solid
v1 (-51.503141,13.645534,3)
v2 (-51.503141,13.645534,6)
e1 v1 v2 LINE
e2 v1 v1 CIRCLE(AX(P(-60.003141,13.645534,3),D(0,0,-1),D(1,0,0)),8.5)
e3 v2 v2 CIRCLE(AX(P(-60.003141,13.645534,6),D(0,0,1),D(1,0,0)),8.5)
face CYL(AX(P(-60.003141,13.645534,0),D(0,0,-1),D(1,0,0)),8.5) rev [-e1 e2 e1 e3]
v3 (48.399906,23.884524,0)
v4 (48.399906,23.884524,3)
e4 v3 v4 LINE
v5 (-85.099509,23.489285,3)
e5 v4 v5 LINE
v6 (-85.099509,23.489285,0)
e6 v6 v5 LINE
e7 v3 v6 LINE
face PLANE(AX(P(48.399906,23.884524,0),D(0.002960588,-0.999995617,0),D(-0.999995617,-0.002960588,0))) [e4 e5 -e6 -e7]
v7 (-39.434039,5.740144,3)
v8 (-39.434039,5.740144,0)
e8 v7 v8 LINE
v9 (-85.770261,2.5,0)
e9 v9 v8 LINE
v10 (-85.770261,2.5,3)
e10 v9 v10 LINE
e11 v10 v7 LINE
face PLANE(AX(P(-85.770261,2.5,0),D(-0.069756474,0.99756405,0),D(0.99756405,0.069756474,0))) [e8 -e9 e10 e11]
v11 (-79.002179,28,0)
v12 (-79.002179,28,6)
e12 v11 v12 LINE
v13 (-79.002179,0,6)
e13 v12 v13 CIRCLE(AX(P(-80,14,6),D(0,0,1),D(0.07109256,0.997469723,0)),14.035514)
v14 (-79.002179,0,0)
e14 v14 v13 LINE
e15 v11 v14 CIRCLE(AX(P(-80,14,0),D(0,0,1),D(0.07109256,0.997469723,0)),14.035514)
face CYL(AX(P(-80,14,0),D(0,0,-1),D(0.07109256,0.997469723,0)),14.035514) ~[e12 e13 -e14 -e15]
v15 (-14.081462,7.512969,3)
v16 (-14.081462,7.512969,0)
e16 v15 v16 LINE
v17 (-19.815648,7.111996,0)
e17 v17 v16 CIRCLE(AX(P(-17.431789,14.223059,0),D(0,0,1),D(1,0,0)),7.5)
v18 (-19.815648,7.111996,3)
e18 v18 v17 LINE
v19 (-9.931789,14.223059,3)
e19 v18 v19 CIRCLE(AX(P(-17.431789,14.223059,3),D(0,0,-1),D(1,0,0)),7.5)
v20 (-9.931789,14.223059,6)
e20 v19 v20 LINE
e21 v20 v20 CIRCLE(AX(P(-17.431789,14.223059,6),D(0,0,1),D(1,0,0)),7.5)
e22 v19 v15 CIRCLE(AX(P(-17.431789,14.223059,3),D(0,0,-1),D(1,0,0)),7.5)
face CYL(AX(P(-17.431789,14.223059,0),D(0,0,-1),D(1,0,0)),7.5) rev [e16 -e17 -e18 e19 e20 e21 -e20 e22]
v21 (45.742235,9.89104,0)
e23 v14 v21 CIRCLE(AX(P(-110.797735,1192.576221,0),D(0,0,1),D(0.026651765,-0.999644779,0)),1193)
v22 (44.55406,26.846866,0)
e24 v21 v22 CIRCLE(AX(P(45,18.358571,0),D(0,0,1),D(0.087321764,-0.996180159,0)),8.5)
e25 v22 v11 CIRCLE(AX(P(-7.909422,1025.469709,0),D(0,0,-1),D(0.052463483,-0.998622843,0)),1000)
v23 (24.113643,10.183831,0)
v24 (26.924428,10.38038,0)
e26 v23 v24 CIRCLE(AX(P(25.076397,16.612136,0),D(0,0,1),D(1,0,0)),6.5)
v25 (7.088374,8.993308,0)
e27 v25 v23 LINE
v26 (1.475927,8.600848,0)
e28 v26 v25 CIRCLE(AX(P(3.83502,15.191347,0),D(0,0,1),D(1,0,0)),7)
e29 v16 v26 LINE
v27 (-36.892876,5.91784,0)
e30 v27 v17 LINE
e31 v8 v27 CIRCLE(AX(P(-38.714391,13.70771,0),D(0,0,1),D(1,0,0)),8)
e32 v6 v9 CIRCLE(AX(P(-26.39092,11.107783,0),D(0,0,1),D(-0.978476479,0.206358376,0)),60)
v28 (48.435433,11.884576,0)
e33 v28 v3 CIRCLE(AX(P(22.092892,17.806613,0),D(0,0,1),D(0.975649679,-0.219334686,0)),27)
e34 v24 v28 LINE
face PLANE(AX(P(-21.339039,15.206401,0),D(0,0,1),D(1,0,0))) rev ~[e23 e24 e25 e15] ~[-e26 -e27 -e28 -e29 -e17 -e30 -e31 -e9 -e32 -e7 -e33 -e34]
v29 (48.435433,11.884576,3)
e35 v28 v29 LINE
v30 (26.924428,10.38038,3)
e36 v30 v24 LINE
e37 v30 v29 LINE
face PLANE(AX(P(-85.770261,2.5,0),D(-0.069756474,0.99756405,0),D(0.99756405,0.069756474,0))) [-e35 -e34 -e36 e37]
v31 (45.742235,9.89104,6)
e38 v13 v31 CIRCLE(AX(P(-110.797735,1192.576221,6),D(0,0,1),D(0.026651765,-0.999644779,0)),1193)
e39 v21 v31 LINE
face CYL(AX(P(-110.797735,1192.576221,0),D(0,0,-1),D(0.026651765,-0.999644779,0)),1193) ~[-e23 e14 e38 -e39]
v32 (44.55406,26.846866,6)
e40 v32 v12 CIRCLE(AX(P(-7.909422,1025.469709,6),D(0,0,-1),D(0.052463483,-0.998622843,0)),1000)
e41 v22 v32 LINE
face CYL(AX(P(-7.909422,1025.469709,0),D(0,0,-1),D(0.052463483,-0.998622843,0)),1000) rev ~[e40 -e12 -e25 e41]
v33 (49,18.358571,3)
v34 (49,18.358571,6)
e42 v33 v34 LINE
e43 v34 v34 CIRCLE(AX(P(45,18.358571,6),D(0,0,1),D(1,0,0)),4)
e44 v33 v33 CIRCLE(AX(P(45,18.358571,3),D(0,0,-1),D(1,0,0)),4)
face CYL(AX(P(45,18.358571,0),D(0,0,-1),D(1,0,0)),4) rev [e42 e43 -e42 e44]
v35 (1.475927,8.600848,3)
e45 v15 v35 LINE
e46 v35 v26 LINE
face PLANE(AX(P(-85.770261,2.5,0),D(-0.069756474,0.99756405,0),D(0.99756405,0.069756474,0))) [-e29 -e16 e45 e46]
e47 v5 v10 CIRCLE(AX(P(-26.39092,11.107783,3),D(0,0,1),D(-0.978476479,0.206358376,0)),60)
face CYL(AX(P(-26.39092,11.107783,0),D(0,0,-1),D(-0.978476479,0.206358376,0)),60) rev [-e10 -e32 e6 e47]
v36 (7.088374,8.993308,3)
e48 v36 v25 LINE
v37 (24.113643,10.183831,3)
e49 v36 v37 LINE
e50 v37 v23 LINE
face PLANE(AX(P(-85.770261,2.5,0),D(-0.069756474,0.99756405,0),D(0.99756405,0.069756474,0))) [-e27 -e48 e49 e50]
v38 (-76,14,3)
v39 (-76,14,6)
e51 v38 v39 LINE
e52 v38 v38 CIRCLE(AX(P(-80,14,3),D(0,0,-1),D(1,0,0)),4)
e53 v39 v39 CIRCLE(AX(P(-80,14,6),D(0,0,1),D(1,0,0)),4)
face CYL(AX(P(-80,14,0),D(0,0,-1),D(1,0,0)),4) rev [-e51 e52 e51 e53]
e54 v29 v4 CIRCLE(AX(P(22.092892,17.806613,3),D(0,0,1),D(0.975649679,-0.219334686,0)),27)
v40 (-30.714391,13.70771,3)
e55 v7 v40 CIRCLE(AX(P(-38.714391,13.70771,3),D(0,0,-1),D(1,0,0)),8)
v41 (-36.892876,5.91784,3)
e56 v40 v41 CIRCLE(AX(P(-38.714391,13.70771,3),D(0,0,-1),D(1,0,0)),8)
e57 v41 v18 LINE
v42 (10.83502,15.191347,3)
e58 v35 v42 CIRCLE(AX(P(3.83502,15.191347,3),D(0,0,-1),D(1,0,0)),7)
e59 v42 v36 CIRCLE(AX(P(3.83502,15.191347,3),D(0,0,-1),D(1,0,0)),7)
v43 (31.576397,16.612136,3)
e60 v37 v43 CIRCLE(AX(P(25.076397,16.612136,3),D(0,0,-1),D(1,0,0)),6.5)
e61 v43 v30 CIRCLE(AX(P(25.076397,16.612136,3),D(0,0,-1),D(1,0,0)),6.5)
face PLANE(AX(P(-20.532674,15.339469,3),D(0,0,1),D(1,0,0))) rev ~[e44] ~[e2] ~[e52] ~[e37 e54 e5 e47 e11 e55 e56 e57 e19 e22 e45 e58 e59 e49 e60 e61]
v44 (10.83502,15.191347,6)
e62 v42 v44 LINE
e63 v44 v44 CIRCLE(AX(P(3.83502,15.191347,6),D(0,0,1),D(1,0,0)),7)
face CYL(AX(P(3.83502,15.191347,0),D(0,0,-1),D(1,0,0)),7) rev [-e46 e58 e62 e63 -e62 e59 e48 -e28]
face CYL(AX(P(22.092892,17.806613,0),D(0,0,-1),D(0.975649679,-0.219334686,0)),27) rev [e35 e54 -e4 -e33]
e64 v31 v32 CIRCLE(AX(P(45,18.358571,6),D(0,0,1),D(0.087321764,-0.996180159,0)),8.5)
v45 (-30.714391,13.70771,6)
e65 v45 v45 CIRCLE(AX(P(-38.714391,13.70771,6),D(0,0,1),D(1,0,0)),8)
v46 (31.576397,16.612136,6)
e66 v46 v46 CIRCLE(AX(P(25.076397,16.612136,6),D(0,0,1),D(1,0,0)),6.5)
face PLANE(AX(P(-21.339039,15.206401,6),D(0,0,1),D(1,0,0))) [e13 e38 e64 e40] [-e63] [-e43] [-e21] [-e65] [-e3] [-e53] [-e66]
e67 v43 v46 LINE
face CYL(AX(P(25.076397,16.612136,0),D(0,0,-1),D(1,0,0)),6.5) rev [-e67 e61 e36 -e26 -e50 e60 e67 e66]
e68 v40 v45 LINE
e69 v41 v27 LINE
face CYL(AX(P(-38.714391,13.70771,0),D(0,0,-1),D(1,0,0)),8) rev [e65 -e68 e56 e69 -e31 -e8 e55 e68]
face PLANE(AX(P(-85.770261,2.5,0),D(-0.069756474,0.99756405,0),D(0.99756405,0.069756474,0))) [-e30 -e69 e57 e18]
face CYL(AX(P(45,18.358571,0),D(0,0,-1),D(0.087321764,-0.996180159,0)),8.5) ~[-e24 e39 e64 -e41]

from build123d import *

# Parameters (mm, degrees)
F0_R     = 8.5
F0_R_2   = 8
F0_R_3   = 4
F0_R_4   = 7.5
F0_R_5   = 7
F0_R_6   = 6.5
F1_DEPTH = 6
F3_DEPTH = 3


# Not quite as in the source:
# - ends of sketch curves that miss each other by under 0.0002 mm in the source are joined


with BuildPart() as f1:
    # F0 (on Top) → F1 (new body)
    with BuildSketch(Plane.XY):
        with BuildLine():
            ThreePointArc((44.5540603798, 26.8468655378), (-17.2418869333, 25.5132571498), (-79.0021794007, 28))
            ThreePointArc((-79.0021794007, 28), (-94.0355137401, 14), (-79.0021794007, 0))
            ThreePointArc((-79.0021794007, 0), (-16.5001968513, 3.3088101205), (45.7422348275, 9.8910396618))
            ThreePointArc((45.7422348275, 9.8910396618), (53.4792070742, 18.9527489424), (44.5540603798, 26.8468655378))
        make_face()
        with Locations((-60.0031413922, 13.6455344589)):
            Circle(F0_R, mode=Mode.SUBTRACT)
        with Locations((-38.7143914059, 13.7077101978)):
            Circle(F0_R_2, mode=Mode.SUBTRACT)
        with Locations((-80, 14)):
            Circle(F0_R_3, mode=Mode.SUBTRACT)
        with Locations((-17.4317891816, 14.2230589801)):
            Circle(F0_R_4, mode=Mode.SUBTRACT)
        with Locations((3.8350196915, 15.191347242)):
            Circle(F0_R_5, mode=Mode.SUBTRACT)
        with Locations((25.0763967822, 16.6121361411)):
            Circle(F0_R_6, mode=Mode.SUBTRACT)
        with Locations((45, 18.3585710294)):
            Circle(F0_R_3, mode=Mode.SUBTRACT)
    extrude(amount=F1_DEPTH)

    # F2 (on Top) → F3 (cut)
    with BuildSketch(Plane.XY):
        with BuildLine():
            Line((48.3999060802, 23.8845237164), (-85.0995088492, 23.4892851738))
            ThreePointArc((-85.0995088492, 23.4892851738), (-86.3603062967, 13.0242161587), (-85.7702605867, 2.5))
            Line((-85.7702605867, 2.5), (48.4354331402, 11.884576307))
            ThreePointArc((48.4354331402, 11.884576307), (49.0927734894, 17.8865487251), (48.3999060802, 23.8845237164))
        make_face()
    extrude(amount=F3_DEPTH, mode=Mode.SUBTRACT)


solid = f1.part
